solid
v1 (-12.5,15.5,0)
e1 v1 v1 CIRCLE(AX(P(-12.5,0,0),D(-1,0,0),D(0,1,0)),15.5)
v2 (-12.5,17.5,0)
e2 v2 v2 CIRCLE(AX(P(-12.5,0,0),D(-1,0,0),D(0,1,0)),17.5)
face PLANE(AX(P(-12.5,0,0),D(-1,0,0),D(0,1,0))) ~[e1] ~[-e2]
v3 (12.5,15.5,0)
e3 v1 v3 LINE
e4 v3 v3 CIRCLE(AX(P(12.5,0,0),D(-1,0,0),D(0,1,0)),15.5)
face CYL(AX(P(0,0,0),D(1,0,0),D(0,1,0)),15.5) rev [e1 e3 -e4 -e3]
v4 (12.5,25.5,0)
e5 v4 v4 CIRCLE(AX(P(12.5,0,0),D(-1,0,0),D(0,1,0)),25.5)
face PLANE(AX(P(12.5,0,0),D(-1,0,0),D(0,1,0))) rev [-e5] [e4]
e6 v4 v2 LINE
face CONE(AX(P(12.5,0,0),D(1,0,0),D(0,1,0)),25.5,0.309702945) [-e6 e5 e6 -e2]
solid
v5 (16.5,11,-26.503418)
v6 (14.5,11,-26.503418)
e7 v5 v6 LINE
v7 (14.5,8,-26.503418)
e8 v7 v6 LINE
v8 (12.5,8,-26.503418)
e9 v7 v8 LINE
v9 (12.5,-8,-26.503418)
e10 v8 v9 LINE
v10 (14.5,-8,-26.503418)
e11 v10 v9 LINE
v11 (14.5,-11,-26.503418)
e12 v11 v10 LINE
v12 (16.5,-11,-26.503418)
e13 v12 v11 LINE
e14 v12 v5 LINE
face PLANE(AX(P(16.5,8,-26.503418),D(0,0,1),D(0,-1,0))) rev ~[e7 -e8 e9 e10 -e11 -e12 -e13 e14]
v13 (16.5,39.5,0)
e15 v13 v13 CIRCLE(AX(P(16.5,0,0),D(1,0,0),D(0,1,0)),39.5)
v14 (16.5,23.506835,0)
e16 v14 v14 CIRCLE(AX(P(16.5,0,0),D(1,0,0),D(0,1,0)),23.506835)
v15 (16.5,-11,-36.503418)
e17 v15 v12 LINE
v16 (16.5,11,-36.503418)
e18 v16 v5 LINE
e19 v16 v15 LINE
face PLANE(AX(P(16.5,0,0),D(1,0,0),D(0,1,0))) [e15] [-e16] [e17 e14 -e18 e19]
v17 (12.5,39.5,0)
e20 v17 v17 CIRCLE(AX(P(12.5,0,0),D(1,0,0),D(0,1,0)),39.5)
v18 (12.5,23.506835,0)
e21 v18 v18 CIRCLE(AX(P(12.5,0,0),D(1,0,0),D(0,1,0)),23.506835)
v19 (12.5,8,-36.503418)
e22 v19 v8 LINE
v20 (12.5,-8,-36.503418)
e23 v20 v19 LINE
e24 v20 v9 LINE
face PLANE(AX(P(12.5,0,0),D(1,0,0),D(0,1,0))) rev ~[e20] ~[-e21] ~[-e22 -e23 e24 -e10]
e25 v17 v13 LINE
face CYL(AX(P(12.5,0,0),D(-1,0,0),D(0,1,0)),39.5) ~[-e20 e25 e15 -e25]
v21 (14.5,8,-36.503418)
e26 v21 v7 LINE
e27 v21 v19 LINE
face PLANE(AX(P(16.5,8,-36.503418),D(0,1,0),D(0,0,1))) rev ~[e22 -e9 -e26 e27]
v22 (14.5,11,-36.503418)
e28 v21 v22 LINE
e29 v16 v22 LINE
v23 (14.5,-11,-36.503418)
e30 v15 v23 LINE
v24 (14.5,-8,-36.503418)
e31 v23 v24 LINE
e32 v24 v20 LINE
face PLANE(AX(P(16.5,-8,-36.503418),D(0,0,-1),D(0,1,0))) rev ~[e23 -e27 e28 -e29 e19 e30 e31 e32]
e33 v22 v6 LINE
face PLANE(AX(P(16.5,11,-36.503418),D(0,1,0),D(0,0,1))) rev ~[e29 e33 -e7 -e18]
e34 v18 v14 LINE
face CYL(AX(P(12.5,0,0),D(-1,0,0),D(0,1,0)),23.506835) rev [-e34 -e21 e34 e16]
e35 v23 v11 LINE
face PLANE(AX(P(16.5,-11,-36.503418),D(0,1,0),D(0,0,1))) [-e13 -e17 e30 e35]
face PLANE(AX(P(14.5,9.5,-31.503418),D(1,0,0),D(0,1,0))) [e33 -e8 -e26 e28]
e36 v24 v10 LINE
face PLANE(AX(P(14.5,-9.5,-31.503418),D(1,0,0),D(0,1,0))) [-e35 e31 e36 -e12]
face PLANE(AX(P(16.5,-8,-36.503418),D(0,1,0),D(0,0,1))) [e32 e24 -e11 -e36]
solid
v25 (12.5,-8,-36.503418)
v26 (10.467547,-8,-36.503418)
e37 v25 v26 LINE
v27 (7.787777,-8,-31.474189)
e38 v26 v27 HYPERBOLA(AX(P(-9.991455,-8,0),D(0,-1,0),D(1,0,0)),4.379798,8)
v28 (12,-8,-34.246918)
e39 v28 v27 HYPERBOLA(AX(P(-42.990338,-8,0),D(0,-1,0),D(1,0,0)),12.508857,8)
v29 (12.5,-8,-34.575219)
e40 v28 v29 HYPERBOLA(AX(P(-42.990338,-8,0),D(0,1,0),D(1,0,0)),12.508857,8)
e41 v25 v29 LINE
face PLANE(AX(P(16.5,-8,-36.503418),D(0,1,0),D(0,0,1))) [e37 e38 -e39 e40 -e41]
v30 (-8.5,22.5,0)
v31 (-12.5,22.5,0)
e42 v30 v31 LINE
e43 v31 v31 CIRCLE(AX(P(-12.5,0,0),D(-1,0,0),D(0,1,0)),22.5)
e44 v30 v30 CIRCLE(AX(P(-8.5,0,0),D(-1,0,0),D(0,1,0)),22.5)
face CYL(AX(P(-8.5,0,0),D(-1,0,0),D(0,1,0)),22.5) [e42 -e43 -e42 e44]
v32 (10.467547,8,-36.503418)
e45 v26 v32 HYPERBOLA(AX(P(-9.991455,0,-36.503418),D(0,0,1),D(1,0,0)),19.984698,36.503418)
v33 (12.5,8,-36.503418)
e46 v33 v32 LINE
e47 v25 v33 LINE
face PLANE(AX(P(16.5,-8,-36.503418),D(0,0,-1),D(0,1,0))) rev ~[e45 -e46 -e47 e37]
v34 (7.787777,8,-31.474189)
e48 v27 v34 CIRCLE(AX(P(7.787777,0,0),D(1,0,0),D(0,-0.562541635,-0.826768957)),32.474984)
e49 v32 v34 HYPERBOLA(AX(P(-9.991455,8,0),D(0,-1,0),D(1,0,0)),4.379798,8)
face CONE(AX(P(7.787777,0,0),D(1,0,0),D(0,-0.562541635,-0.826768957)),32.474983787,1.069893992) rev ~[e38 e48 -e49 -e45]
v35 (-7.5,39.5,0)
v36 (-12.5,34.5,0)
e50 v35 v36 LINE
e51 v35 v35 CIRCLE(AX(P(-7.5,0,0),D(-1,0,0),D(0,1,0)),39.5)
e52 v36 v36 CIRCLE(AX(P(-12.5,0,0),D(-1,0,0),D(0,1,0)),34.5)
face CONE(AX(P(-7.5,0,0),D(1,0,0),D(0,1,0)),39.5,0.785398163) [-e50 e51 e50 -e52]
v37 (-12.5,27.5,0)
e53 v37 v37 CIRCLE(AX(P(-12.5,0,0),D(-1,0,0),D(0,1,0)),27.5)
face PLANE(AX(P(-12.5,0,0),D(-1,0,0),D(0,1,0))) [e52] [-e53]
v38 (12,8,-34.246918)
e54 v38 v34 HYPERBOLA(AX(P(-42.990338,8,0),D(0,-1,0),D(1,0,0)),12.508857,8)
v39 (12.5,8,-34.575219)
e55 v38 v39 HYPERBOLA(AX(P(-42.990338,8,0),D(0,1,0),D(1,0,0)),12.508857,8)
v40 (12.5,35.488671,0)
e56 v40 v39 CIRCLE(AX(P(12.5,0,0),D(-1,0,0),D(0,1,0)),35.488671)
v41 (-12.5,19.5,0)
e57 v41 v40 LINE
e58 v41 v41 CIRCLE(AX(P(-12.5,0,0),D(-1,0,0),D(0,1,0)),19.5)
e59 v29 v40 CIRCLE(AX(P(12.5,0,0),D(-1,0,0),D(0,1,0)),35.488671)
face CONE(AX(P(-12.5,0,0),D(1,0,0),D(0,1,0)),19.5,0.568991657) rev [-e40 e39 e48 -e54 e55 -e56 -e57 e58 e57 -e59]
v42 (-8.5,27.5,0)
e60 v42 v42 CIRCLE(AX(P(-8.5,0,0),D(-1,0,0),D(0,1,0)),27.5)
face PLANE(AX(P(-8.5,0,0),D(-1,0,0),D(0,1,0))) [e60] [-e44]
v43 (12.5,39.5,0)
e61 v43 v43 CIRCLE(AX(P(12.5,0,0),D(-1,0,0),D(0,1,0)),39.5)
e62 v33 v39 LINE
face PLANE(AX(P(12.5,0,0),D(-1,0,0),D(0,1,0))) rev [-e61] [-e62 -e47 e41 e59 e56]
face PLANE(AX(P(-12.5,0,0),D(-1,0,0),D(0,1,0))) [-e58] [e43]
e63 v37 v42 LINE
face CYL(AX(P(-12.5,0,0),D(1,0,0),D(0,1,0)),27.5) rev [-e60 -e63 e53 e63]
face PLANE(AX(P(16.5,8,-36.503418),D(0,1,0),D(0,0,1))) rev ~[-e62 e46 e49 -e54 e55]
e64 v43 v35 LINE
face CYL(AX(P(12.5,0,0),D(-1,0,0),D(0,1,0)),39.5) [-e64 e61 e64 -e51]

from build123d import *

# Parameters (mm, degrees)
F0_W        = 25
F0_H        = 2
F2_SIZE     = 5
F3_R        = 39.5
F3_R_2      = 23.5068353711
F4_DEPTH    = 4
F5_W        = 8
F5_H        = 10
F6_DEPTH    = 4.5
F5_W_2      = 3
F7_DEPTH    = 2
F8_T4_ANGLE = 68.4635032376


# Not quite as in the source:
# - a fillet or chamfer that OpenCascade refuses, or shapes differently, is made with other operations: its cross-section is extruded or revolved along the edge and cut away or added


with BuildPart() as f1:
    # F0 (on Top) → F1 (revolve)
    with BuildSketch(Plane.XY):
        with Locations((0, 16.5)):
            Rectangle(F0_W, F0_H)
        Polygon((12.5, 25.5), (-12.5, 17.5), (12.5, 17.5), align=None)
    revolve(axis=Axis((0, 0, 0), (-1, 0, 0)))


with BuildPart() as f1b:
    # F0 (on Top) → F1, piece 2 (revolve)
    with BuildSketch(Plane.XY):
        Polygon((-12.5, 22.5), (-12.5, 19.5), (12.5, 35.4886714636), (12.5, 39.5), (-12.5, 39.5), (-12.5, 27.5), (-8.5, 27.5), (-8.5, 22.5), align=None)
    revolve(axis=Axis((0, 0, 0), (-1, 0, 0)))

    # F2
    f2_edges = [f1b.edges().sort_by_distance(p)[0] for p in [
        (-12.5, -39.5, 0),
    ]]
    chamfer(f2_edges, length=F2_SIZE)


with BuildPart() as f4:
    # F3 (on face) → F4 (new body)
    with BuildSketch(Plane.YZ.offset(12.5)):
        Circle(F3_R)
        Circle(F3_R_2, mode=Mode.SUBTRACT)
    extrude(amount=F4_DEPTH)


with BuildPart() as f6_tool:
    # F5 (on face) → F6 (new body)
    with BuildSketch(Plane.YZ.offset(16.5)):
        with Locations((-4, -31.5034176856)):
            Rectangle(F5_W, F5_H)
        with Locations((4, -31.5034176856)):
            Rectangle(F5_W, F5_H)
    extrude(amount=-F6_DEPTH)


with BuildPart() as f1b_1:
    add(f1b.part)

    # F6: cut by f6_tool
    add(f6_tool.part, mode=Mode.SUBTRACT)

    # F8: chamfer of 5 on 1 edges, made by hand


with BuildPart() as f4_1:
    add(f4.part)

    # F6: cut by f6_tool
    add(f6_tool.part, mode=Mode.SUBTRACT)

    # F5 (on face) → F7 (cut)
    with BuildSketch(Plane.YZ.offset(16.5)):
        with Locations((-9.5, -31.5034176856)):
            Rectangle(F5_W_2, F5_H)
        with Locations((9.5, -31.5034176856)):
            Rectangle(F5_W_2, F5_H)
    extrude(amount=-F7_DEPTH, mode=Mode.SUBTRACT)


with BuildPart() as f8_tool2:
    # F8_s3 → F8_t4 (revolve)
    with BuildSketch(Plane(origin=(0, 0, 0), x_dir=(1, 0, 0), z_dir=(0, -0.8267689574, 0.562541635))):
        Polygon((7.7877765933, -32.474983787), (12, -40.1688980343), (12, -35.1688980343), align=None)
    revolve(axis=Axis((12, 0, 0), (1, 0, 0)), revolution_arc=F8_T4_ANGLE)

    split(bisect_by=Plane.XZ.offset(8), keep=Keep.BOTTOM)

    split(bisect_by=Plane.XY.offset(-36.5034176856), keep=Keep.TOP)

    split(bisect_by=Plane.XZ.offset(-8), keep=Keep.TOP)


with BuildPart() as f1b_2:
    add(f1b_1.part)

    # F8_t1: cut F8_tool2
    add(f8_tool2.part, mode=Mode.SUBTRACT)


solid = Compound([f1.part, f4_1.part, f1b_2.part])
